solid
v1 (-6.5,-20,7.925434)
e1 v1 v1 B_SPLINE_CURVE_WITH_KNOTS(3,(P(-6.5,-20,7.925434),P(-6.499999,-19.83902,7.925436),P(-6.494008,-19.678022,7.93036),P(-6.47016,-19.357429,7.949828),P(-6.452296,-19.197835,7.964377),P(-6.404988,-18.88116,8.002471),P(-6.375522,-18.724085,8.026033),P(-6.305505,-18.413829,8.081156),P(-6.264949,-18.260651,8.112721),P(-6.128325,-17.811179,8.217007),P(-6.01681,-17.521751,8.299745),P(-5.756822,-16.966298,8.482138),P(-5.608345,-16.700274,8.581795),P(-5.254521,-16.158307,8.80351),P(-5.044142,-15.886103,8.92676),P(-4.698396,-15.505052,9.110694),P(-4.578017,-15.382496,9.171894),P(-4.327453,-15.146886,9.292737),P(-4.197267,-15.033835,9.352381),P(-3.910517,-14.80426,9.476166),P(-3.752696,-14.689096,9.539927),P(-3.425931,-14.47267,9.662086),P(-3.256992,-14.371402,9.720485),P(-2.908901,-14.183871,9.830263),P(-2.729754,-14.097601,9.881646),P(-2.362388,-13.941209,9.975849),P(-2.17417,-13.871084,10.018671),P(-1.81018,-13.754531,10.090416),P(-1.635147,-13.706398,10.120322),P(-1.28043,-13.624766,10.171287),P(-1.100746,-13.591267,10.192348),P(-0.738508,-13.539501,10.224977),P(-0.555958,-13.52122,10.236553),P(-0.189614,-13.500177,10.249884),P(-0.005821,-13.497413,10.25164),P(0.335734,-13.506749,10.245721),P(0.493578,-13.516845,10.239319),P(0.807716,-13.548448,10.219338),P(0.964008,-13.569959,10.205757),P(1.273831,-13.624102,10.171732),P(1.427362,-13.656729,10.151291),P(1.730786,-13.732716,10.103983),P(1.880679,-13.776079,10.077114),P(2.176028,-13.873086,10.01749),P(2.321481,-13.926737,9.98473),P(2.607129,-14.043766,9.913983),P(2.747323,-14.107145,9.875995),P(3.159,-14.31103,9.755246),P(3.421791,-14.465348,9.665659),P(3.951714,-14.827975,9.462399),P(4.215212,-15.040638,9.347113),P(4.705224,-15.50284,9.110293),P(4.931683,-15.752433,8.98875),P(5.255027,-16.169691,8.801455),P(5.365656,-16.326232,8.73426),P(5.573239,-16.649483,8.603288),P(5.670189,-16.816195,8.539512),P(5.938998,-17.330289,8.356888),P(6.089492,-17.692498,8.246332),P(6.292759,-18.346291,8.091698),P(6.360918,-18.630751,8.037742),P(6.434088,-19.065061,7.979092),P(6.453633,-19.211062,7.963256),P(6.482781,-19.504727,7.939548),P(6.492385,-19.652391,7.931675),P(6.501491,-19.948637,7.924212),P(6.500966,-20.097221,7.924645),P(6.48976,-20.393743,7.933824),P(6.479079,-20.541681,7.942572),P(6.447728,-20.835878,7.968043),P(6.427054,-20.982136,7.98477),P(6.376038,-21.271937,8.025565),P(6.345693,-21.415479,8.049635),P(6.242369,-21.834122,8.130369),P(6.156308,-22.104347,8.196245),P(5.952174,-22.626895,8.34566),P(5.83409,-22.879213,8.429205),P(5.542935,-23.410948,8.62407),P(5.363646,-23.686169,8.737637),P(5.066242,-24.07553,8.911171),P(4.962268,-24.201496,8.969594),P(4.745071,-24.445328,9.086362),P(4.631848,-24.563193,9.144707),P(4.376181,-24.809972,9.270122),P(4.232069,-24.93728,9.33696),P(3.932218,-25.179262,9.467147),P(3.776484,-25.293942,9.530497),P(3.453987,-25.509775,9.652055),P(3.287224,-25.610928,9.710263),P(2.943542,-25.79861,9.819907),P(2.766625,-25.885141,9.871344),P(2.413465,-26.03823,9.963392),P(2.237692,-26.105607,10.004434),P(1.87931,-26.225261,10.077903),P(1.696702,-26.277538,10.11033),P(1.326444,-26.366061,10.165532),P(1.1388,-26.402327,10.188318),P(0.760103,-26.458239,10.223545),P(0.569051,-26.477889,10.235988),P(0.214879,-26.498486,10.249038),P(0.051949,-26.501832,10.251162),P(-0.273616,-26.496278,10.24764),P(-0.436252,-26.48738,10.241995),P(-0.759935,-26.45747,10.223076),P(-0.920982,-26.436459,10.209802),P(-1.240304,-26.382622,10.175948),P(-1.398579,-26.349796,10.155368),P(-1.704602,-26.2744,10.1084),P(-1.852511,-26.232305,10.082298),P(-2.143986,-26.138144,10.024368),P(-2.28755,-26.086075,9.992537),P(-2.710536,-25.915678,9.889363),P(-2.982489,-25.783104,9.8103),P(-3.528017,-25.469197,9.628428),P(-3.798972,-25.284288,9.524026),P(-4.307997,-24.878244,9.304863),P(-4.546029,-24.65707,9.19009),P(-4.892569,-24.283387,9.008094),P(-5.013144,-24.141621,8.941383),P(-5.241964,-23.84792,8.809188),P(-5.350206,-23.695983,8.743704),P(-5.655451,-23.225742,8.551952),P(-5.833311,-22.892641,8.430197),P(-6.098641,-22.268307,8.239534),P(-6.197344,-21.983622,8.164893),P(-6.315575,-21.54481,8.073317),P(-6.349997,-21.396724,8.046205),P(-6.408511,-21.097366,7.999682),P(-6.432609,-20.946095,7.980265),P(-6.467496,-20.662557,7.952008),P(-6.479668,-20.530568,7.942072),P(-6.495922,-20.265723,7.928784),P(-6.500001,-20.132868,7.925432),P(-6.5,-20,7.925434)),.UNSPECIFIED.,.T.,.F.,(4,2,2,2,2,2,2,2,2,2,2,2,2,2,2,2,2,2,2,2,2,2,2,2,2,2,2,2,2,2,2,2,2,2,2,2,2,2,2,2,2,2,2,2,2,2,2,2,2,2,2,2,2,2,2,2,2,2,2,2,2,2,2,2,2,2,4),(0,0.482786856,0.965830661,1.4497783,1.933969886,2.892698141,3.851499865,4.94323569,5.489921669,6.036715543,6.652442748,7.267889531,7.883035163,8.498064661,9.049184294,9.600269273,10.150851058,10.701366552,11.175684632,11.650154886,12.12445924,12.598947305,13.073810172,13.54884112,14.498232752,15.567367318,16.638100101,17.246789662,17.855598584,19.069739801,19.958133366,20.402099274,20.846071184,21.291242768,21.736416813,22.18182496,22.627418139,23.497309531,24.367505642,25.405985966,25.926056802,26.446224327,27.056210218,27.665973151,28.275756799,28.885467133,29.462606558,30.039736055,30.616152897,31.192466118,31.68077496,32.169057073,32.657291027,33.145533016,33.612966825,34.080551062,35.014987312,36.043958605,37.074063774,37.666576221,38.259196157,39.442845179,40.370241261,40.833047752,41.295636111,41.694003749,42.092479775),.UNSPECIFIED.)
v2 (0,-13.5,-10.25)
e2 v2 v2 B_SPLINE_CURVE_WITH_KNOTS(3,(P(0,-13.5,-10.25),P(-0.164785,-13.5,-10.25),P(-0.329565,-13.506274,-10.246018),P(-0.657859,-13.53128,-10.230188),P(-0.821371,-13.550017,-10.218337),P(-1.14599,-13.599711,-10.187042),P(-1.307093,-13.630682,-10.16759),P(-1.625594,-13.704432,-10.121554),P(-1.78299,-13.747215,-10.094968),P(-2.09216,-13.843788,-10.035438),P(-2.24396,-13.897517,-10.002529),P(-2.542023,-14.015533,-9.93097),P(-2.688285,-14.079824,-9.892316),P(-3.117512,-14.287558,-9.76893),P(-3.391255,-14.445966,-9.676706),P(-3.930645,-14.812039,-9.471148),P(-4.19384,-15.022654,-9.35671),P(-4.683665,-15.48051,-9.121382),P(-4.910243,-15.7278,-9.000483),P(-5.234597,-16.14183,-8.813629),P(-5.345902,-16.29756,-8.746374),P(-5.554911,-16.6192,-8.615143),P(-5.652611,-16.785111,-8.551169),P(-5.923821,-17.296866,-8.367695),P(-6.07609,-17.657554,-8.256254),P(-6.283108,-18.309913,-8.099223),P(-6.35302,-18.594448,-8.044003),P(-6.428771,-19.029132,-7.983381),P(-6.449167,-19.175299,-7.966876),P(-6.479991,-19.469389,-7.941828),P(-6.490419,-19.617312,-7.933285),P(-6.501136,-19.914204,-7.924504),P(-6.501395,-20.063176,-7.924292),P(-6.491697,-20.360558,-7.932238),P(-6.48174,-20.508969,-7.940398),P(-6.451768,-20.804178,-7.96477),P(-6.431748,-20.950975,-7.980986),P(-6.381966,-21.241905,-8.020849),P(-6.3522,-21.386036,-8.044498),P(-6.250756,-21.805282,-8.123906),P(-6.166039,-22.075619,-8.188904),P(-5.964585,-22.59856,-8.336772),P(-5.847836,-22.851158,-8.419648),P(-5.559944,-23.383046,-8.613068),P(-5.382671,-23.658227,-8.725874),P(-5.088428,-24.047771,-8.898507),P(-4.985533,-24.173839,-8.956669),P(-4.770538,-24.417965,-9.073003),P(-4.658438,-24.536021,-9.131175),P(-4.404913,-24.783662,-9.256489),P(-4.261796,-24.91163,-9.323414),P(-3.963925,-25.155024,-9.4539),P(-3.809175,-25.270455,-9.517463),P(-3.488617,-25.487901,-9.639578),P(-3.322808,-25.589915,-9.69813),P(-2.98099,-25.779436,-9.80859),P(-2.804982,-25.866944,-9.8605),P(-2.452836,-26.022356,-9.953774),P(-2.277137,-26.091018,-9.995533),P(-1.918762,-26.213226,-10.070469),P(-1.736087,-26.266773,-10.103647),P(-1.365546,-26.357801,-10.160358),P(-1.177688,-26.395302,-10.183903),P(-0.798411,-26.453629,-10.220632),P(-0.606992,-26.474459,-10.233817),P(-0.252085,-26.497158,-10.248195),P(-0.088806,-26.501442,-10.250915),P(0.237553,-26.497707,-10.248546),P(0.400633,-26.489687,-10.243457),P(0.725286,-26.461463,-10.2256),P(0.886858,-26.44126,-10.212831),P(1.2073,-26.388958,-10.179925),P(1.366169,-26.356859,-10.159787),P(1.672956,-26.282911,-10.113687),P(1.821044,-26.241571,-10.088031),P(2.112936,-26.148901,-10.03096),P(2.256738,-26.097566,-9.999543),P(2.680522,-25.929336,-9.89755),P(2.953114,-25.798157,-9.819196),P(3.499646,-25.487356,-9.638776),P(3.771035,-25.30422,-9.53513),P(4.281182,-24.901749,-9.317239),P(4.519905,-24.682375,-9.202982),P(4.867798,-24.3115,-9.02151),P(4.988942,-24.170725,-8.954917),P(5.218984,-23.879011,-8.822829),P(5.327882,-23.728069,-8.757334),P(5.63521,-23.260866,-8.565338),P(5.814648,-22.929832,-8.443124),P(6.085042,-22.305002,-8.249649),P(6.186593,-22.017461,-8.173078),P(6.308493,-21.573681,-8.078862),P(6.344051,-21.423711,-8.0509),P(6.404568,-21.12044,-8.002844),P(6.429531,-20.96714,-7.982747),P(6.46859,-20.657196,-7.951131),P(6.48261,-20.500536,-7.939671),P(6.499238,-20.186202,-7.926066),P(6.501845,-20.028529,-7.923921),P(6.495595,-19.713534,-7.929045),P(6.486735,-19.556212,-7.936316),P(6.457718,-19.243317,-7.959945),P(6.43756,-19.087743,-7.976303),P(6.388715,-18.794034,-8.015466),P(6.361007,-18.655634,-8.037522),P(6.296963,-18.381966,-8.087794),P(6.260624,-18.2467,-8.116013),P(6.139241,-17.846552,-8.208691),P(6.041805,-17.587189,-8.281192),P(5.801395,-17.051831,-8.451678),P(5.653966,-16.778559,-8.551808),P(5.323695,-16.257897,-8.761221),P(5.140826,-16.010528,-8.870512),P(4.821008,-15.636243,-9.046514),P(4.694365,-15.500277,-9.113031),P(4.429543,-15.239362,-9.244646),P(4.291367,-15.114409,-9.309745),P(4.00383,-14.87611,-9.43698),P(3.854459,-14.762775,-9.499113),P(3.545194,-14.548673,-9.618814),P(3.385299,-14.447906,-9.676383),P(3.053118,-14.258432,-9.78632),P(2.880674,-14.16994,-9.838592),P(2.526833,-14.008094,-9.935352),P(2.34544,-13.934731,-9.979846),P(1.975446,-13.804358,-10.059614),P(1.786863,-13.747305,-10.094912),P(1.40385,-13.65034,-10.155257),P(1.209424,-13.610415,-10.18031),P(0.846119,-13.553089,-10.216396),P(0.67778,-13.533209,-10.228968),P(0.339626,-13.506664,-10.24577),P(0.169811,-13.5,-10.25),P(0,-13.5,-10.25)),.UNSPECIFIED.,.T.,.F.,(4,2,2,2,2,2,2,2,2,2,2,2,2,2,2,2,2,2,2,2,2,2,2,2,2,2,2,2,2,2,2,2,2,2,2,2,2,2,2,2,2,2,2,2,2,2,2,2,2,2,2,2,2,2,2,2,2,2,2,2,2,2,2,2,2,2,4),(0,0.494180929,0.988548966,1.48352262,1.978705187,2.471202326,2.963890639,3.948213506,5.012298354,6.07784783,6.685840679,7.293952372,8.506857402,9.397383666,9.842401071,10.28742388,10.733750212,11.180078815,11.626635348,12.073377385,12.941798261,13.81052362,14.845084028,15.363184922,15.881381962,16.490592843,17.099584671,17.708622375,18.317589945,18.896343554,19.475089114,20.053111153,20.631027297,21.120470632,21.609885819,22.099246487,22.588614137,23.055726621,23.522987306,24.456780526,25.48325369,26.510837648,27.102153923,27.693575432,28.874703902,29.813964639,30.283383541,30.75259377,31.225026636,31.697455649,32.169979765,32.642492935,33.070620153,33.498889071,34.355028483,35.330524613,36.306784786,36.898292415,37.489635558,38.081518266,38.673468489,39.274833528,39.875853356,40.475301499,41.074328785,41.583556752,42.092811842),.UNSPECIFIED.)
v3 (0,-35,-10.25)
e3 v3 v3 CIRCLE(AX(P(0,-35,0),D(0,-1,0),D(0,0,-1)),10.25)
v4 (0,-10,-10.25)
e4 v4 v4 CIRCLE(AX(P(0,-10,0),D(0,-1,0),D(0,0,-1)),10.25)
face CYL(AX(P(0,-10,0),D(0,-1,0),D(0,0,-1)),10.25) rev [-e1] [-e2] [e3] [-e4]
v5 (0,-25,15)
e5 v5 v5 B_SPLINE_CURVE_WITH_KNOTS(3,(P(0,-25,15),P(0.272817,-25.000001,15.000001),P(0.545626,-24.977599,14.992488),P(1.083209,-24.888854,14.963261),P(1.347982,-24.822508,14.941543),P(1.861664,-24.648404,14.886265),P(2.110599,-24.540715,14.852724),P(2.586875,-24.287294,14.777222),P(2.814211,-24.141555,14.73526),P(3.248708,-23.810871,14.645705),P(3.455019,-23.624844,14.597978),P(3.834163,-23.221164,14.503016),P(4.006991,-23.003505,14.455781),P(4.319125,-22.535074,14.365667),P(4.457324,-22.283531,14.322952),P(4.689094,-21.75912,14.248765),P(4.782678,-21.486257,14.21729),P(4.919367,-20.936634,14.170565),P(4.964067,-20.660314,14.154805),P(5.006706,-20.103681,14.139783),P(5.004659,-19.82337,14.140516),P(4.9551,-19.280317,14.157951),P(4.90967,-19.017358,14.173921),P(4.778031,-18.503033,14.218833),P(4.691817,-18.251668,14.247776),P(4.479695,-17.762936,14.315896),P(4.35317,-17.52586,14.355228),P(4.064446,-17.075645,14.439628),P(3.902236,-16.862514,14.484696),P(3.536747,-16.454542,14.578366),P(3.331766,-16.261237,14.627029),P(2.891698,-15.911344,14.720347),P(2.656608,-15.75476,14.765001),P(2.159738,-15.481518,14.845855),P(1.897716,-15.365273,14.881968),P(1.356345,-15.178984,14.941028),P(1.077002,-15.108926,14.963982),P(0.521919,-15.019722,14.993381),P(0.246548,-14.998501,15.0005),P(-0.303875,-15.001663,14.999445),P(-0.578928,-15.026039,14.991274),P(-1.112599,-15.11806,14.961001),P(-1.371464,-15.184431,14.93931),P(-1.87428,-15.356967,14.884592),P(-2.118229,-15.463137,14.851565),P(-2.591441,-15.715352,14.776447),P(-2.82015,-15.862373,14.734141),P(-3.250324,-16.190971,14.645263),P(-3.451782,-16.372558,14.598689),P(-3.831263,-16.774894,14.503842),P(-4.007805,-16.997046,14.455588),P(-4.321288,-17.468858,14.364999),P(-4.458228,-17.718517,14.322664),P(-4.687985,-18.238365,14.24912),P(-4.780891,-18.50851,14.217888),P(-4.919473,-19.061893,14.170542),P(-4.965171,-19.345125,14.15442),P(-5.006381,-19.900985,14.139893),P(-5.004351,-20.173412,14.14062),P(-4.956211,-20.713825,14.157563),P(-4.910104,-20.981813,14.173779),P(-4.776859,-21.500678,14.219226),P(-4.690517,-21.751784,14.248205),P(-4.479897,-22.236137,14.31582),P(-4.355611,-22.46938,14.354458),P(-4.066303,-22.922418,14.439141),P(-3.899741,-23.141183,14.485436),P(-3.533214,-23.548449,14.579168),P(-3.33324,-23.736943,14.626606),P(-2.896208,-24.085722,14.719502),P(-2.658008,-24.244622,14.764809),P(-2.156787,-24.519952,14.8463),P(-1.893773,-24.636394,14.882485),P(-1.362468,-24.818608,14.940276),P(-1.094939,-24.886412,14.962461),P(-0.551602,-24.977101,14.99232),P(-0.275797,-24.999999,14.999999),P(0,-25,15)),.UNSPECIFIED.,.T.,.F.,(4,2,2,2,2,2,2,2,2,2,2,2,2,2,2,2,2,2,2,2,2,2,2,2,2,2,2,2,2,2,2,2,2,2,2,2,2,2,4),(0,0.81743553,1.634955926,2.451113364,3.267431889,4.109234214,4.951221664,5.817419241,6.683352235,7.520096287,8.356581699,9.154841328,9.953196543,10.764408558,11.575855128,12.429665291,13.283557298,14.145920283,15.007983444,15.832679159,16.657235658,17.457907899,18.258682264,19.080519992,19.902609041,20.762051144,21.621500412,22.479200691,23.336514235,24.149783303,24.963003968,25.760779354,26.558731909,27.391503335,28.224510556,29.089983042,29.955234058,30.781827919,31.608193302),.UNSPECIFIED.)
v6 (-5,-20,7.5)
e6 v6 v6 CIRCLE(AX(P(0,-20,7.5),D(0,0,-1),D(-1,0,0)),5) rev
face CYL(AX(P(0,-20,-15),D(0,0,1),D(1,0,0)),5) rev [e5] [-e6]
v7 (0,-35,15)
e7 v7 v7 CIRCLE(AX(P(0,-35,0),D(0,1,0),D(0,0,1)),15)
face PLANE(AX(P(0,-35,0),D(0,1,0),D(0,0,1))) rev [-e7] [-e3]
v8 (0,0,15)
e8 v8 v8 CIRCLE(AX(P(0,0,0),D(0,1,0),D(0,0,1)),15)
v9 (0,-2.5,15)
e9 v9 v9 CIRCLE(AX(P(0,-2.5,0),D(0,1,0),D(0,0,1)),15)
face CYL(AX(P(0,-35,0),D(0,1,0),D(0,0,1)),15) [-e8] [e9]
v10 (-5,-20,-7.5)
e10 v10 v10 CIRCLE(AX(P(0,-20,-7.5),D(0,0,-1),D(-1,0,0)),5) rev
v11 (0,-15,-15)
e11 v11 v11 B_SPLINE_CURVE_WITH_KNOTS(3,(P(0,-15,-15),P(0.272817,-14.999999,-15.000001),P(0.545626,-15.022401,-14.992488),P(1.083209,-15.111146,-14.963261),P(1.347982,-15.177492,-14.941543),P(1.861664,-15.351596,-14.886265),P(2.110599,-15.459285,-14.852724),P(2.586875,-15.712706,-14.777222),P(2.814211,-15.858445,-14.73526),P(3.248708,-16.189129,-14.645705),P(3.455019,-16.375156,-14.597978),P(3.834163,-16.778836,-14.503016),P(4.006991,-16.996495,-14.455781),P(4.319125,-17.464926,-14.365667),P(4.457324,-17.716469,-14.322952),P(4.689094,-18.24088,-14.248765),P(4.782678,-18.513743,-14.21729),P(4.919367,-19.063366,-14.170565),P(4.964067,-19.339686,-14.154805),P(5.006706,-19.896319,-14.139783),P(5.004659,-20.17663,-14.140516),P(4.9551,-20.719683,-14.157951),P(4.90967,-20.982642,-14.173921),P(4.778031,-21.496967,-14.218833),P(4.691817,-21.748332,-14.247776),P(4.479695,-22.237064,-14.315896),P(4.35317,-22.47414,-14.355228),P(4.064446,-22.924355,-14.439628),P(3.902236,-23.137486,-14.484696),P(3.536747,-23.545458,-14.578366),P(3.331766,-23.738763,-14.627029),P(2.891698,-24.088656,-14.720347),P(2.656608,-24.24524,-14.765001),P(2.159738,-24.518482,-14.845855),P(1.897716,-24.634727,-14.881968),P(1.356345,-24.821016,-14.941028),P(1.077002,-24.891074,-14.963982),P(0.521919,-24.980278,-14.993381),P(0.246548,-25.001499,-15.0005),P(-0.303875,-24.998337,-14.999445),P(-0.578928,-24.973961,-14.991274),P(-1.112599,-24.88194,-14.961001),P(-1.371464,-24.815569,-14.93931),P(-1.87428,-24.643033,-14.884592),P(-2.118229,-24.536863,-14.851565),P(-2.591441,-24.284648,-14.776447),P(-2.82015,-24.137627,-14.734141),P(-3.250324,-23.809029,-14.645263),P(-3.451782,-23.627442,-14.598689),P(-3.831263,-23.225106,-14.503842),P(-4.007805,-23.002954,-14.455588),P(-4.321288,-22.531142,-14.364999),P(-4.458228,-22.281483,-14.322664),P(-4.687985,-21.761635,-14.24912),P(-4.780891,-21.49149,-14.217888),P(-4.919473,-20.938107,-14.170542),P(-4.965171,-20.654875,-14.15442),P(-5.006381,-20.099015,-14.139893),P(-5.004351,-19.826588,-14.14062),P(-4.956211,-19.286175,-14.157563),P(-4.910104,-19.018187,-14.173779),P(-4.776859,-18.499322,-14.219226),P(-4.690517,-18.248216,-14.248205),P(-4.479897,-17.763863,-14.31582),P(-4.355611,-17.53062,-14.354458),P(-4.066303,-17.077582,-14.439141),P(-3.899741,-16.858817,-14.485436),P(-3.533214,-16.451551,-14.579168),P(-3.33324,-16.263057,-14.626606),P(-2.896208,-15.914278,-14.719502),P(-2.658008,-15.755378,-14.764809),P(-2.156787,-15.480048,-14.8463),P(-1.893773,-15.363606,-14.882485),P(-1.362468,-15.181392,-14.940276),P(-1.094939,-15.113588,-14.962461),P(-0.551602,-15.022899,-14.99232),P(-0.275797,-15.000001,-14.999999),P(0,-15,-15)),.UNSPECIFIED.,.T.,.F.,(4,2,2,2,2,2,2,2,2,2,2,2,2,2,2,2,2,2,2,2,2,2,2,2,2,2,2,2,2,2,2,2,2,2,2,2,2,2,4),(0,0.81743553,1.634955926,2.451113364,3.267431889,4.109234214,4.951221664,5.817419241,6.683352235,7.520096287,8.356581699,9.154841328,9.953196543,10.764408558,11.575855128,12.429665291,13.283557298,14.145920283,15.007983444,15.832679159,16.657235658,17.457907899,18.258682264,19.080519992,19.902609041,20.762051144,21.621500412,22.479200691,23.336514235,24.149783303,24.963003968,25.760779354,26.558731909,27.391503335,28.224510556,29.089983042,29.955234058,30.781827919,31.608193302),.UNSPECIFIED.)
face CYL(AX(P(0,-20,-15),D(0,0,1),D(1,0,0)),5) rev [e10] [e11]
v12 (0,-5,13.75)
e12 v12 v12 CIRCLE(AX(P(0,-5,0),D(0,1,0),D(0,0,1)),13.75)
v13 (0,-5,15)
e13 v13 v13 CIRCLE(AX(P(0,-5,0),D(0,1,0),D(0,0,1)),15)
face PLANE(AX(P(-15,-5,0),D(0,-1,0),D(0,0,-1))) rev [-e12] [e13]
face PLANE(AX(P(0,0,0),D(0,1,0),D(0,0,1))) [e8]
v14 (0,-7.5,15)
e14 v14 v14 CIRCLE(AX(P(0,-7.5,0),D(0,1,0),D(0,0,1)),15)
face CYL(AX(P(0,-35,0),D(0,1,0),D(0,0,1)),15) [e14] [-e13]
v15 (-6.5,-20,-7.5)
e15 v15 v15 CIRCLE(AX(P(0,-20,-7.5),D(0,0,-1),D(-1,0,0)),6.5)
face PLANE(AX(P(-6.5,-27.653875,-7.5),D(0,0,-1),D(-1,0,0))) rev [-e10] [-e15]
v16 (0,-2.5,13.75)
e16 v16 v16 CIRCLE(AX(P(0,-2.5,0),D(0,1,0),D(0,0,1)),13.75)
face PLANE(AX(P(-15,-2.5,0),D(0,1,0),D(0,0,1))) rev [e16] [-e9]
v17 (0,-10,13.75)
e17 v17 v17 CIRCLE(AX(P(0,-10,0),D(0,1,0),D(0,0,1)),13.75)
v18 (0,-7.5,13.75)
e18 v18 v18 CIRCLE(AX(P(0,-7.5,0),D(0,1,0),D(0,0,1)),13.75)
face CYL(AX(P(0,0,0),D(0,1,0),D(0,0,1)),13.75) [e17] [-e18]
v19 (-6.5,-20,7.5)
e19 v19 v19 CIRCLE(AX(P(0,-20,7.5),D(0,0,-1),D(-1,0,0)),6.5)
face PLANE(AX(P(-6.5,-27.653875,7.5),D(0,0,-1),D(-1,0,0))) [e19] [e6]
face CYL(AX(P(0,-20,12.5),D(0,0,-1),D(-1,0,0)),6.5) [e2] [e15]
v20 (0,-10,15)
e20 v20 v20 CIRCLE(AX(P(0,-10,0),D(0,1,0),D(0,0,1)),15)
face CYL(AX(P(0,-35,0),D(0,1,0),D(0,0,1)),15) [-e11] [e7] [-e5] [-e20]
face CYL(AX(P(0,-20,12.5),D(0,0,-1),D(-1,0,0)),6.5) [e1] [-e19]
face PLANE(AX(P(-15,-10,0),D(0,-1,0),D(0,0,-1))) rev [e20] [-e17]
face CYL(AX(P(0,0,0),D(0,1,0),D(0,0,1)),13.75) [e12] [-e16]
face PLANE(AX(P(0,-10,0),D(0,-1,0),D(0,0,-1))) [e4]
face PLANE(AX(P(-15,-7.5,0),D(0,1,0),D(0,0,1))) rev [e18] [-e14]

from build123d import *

# Parameters (mm, degrees)
SKETCH1_R           = 15
BOSS_EXTRUDE1_DEPTH = 35
SKETCH2_W           = 1.25
SKETCH2_H           = 2.5
SKETCH4_R           = 5
CUT_EXTRUDE1_DEPTH  = 15
SKETCH5_R           = 10.25
CUT_EXTRUDE2_DEPTH  = 25
SKETCH6_R           = 6.5
SKETCH6_R_2         = 5
BOSS_EXTRUDE2_DEPTH = 12.5
SKETCH9_W           = 15
SKETCH9_H           = 15
CUT_EXTRUDE4_DEPTH  = 13


with BuildPart() as part:
    # Sketch1 → Boss-Extrude1 (new body)
    with BuildSketch(Plane(origin=(0, 0, 0), x_dir=(1, 0, 0), z_dir=(0, 1, 0))):
        with Locations(Location((0, 0, 0), (0, 0, 270))):
            Circle(SKETCH1_R)
    extrude(amount=-BOSS_EXTRUDE1_DEPTH)

    # Sketch2 → Cut-Revolve3 (revolve, cut)
    with BuildSketch(Plane.XY, mode=Mode.PRIVATE) as cut_revolve3_sk:
        with Locations((-14.375, -3.75)):
            Rectangle(SKETCH2_W, SKETCH2_H)
        with Locations((-14.375, -8.75)):
            Rectangle(SKETCH2_W, SKETCH2_H)
    revolve(cut_revolve3_sk.sketch.rotate(Axis((0, 0, 0), (0, 1, 0)), 90), axis=Axis((0, 0, 0), (0, 1, 0)), mode=Mode.SUBTRACT)

    # Sketch4 → Cut-Extrude1 (cut, symmetric)
    with BuildSketch(Plane.XY):
        with Locations(Location((0, -20, 0), (0, 0, 90))):
            Circle(SKETCH4_R)
    extrude(amount=CUT_EXTRUDE1_DEPTH, both=True, mode=Mode.SUBTRACT)

    # Sketch5 → Cut-Extrude2 (cut)
    with BuildSketch(Plane(origin=(0, -35, 0), x_dir=(-1, 0, 0), z_dir=(0, -1, 0))):
        with Locations(Location((0, 0, 0), (0, 0, 90))):
            Circle(SKETCH5_R)
    extrude(amount=-CUT_EXTRUDE2_DEPTH, mode=Mode.SUBTRACT)

    # Sketch6 → Boss-Extrude2 (add, symmetric)
    with BuildSketch(Plane.XY):
        with Locations(Location((0, -20, 0), (0, 0, 180))):
            Circle(SKETCH6_R)
        with Locations(Location((0, -20, 0), (0, 0, 90))):
            Circle(SKETCH6_R_2, mode=Mode.SUBTRACT)
    extrude(amount=BOSS_EXTRUDE2_DEPTH, both=True)

    # Sketch9 → Cut-Extrude4 (cut)
    with BuildSketch(Plane(origin=(6.5, 0, 0), x_dir=(0, 0, -1), z_dir=(1, 0, 0))):
        with Locations((0, -20.153875376)):
            Rectangle(SKETCH9_W, SKETCH9_H)
    extrude(amount=-CUT_EXTRUDE4_DEPTH, mode=Mode.SUBTRACT)


solid = part.part
